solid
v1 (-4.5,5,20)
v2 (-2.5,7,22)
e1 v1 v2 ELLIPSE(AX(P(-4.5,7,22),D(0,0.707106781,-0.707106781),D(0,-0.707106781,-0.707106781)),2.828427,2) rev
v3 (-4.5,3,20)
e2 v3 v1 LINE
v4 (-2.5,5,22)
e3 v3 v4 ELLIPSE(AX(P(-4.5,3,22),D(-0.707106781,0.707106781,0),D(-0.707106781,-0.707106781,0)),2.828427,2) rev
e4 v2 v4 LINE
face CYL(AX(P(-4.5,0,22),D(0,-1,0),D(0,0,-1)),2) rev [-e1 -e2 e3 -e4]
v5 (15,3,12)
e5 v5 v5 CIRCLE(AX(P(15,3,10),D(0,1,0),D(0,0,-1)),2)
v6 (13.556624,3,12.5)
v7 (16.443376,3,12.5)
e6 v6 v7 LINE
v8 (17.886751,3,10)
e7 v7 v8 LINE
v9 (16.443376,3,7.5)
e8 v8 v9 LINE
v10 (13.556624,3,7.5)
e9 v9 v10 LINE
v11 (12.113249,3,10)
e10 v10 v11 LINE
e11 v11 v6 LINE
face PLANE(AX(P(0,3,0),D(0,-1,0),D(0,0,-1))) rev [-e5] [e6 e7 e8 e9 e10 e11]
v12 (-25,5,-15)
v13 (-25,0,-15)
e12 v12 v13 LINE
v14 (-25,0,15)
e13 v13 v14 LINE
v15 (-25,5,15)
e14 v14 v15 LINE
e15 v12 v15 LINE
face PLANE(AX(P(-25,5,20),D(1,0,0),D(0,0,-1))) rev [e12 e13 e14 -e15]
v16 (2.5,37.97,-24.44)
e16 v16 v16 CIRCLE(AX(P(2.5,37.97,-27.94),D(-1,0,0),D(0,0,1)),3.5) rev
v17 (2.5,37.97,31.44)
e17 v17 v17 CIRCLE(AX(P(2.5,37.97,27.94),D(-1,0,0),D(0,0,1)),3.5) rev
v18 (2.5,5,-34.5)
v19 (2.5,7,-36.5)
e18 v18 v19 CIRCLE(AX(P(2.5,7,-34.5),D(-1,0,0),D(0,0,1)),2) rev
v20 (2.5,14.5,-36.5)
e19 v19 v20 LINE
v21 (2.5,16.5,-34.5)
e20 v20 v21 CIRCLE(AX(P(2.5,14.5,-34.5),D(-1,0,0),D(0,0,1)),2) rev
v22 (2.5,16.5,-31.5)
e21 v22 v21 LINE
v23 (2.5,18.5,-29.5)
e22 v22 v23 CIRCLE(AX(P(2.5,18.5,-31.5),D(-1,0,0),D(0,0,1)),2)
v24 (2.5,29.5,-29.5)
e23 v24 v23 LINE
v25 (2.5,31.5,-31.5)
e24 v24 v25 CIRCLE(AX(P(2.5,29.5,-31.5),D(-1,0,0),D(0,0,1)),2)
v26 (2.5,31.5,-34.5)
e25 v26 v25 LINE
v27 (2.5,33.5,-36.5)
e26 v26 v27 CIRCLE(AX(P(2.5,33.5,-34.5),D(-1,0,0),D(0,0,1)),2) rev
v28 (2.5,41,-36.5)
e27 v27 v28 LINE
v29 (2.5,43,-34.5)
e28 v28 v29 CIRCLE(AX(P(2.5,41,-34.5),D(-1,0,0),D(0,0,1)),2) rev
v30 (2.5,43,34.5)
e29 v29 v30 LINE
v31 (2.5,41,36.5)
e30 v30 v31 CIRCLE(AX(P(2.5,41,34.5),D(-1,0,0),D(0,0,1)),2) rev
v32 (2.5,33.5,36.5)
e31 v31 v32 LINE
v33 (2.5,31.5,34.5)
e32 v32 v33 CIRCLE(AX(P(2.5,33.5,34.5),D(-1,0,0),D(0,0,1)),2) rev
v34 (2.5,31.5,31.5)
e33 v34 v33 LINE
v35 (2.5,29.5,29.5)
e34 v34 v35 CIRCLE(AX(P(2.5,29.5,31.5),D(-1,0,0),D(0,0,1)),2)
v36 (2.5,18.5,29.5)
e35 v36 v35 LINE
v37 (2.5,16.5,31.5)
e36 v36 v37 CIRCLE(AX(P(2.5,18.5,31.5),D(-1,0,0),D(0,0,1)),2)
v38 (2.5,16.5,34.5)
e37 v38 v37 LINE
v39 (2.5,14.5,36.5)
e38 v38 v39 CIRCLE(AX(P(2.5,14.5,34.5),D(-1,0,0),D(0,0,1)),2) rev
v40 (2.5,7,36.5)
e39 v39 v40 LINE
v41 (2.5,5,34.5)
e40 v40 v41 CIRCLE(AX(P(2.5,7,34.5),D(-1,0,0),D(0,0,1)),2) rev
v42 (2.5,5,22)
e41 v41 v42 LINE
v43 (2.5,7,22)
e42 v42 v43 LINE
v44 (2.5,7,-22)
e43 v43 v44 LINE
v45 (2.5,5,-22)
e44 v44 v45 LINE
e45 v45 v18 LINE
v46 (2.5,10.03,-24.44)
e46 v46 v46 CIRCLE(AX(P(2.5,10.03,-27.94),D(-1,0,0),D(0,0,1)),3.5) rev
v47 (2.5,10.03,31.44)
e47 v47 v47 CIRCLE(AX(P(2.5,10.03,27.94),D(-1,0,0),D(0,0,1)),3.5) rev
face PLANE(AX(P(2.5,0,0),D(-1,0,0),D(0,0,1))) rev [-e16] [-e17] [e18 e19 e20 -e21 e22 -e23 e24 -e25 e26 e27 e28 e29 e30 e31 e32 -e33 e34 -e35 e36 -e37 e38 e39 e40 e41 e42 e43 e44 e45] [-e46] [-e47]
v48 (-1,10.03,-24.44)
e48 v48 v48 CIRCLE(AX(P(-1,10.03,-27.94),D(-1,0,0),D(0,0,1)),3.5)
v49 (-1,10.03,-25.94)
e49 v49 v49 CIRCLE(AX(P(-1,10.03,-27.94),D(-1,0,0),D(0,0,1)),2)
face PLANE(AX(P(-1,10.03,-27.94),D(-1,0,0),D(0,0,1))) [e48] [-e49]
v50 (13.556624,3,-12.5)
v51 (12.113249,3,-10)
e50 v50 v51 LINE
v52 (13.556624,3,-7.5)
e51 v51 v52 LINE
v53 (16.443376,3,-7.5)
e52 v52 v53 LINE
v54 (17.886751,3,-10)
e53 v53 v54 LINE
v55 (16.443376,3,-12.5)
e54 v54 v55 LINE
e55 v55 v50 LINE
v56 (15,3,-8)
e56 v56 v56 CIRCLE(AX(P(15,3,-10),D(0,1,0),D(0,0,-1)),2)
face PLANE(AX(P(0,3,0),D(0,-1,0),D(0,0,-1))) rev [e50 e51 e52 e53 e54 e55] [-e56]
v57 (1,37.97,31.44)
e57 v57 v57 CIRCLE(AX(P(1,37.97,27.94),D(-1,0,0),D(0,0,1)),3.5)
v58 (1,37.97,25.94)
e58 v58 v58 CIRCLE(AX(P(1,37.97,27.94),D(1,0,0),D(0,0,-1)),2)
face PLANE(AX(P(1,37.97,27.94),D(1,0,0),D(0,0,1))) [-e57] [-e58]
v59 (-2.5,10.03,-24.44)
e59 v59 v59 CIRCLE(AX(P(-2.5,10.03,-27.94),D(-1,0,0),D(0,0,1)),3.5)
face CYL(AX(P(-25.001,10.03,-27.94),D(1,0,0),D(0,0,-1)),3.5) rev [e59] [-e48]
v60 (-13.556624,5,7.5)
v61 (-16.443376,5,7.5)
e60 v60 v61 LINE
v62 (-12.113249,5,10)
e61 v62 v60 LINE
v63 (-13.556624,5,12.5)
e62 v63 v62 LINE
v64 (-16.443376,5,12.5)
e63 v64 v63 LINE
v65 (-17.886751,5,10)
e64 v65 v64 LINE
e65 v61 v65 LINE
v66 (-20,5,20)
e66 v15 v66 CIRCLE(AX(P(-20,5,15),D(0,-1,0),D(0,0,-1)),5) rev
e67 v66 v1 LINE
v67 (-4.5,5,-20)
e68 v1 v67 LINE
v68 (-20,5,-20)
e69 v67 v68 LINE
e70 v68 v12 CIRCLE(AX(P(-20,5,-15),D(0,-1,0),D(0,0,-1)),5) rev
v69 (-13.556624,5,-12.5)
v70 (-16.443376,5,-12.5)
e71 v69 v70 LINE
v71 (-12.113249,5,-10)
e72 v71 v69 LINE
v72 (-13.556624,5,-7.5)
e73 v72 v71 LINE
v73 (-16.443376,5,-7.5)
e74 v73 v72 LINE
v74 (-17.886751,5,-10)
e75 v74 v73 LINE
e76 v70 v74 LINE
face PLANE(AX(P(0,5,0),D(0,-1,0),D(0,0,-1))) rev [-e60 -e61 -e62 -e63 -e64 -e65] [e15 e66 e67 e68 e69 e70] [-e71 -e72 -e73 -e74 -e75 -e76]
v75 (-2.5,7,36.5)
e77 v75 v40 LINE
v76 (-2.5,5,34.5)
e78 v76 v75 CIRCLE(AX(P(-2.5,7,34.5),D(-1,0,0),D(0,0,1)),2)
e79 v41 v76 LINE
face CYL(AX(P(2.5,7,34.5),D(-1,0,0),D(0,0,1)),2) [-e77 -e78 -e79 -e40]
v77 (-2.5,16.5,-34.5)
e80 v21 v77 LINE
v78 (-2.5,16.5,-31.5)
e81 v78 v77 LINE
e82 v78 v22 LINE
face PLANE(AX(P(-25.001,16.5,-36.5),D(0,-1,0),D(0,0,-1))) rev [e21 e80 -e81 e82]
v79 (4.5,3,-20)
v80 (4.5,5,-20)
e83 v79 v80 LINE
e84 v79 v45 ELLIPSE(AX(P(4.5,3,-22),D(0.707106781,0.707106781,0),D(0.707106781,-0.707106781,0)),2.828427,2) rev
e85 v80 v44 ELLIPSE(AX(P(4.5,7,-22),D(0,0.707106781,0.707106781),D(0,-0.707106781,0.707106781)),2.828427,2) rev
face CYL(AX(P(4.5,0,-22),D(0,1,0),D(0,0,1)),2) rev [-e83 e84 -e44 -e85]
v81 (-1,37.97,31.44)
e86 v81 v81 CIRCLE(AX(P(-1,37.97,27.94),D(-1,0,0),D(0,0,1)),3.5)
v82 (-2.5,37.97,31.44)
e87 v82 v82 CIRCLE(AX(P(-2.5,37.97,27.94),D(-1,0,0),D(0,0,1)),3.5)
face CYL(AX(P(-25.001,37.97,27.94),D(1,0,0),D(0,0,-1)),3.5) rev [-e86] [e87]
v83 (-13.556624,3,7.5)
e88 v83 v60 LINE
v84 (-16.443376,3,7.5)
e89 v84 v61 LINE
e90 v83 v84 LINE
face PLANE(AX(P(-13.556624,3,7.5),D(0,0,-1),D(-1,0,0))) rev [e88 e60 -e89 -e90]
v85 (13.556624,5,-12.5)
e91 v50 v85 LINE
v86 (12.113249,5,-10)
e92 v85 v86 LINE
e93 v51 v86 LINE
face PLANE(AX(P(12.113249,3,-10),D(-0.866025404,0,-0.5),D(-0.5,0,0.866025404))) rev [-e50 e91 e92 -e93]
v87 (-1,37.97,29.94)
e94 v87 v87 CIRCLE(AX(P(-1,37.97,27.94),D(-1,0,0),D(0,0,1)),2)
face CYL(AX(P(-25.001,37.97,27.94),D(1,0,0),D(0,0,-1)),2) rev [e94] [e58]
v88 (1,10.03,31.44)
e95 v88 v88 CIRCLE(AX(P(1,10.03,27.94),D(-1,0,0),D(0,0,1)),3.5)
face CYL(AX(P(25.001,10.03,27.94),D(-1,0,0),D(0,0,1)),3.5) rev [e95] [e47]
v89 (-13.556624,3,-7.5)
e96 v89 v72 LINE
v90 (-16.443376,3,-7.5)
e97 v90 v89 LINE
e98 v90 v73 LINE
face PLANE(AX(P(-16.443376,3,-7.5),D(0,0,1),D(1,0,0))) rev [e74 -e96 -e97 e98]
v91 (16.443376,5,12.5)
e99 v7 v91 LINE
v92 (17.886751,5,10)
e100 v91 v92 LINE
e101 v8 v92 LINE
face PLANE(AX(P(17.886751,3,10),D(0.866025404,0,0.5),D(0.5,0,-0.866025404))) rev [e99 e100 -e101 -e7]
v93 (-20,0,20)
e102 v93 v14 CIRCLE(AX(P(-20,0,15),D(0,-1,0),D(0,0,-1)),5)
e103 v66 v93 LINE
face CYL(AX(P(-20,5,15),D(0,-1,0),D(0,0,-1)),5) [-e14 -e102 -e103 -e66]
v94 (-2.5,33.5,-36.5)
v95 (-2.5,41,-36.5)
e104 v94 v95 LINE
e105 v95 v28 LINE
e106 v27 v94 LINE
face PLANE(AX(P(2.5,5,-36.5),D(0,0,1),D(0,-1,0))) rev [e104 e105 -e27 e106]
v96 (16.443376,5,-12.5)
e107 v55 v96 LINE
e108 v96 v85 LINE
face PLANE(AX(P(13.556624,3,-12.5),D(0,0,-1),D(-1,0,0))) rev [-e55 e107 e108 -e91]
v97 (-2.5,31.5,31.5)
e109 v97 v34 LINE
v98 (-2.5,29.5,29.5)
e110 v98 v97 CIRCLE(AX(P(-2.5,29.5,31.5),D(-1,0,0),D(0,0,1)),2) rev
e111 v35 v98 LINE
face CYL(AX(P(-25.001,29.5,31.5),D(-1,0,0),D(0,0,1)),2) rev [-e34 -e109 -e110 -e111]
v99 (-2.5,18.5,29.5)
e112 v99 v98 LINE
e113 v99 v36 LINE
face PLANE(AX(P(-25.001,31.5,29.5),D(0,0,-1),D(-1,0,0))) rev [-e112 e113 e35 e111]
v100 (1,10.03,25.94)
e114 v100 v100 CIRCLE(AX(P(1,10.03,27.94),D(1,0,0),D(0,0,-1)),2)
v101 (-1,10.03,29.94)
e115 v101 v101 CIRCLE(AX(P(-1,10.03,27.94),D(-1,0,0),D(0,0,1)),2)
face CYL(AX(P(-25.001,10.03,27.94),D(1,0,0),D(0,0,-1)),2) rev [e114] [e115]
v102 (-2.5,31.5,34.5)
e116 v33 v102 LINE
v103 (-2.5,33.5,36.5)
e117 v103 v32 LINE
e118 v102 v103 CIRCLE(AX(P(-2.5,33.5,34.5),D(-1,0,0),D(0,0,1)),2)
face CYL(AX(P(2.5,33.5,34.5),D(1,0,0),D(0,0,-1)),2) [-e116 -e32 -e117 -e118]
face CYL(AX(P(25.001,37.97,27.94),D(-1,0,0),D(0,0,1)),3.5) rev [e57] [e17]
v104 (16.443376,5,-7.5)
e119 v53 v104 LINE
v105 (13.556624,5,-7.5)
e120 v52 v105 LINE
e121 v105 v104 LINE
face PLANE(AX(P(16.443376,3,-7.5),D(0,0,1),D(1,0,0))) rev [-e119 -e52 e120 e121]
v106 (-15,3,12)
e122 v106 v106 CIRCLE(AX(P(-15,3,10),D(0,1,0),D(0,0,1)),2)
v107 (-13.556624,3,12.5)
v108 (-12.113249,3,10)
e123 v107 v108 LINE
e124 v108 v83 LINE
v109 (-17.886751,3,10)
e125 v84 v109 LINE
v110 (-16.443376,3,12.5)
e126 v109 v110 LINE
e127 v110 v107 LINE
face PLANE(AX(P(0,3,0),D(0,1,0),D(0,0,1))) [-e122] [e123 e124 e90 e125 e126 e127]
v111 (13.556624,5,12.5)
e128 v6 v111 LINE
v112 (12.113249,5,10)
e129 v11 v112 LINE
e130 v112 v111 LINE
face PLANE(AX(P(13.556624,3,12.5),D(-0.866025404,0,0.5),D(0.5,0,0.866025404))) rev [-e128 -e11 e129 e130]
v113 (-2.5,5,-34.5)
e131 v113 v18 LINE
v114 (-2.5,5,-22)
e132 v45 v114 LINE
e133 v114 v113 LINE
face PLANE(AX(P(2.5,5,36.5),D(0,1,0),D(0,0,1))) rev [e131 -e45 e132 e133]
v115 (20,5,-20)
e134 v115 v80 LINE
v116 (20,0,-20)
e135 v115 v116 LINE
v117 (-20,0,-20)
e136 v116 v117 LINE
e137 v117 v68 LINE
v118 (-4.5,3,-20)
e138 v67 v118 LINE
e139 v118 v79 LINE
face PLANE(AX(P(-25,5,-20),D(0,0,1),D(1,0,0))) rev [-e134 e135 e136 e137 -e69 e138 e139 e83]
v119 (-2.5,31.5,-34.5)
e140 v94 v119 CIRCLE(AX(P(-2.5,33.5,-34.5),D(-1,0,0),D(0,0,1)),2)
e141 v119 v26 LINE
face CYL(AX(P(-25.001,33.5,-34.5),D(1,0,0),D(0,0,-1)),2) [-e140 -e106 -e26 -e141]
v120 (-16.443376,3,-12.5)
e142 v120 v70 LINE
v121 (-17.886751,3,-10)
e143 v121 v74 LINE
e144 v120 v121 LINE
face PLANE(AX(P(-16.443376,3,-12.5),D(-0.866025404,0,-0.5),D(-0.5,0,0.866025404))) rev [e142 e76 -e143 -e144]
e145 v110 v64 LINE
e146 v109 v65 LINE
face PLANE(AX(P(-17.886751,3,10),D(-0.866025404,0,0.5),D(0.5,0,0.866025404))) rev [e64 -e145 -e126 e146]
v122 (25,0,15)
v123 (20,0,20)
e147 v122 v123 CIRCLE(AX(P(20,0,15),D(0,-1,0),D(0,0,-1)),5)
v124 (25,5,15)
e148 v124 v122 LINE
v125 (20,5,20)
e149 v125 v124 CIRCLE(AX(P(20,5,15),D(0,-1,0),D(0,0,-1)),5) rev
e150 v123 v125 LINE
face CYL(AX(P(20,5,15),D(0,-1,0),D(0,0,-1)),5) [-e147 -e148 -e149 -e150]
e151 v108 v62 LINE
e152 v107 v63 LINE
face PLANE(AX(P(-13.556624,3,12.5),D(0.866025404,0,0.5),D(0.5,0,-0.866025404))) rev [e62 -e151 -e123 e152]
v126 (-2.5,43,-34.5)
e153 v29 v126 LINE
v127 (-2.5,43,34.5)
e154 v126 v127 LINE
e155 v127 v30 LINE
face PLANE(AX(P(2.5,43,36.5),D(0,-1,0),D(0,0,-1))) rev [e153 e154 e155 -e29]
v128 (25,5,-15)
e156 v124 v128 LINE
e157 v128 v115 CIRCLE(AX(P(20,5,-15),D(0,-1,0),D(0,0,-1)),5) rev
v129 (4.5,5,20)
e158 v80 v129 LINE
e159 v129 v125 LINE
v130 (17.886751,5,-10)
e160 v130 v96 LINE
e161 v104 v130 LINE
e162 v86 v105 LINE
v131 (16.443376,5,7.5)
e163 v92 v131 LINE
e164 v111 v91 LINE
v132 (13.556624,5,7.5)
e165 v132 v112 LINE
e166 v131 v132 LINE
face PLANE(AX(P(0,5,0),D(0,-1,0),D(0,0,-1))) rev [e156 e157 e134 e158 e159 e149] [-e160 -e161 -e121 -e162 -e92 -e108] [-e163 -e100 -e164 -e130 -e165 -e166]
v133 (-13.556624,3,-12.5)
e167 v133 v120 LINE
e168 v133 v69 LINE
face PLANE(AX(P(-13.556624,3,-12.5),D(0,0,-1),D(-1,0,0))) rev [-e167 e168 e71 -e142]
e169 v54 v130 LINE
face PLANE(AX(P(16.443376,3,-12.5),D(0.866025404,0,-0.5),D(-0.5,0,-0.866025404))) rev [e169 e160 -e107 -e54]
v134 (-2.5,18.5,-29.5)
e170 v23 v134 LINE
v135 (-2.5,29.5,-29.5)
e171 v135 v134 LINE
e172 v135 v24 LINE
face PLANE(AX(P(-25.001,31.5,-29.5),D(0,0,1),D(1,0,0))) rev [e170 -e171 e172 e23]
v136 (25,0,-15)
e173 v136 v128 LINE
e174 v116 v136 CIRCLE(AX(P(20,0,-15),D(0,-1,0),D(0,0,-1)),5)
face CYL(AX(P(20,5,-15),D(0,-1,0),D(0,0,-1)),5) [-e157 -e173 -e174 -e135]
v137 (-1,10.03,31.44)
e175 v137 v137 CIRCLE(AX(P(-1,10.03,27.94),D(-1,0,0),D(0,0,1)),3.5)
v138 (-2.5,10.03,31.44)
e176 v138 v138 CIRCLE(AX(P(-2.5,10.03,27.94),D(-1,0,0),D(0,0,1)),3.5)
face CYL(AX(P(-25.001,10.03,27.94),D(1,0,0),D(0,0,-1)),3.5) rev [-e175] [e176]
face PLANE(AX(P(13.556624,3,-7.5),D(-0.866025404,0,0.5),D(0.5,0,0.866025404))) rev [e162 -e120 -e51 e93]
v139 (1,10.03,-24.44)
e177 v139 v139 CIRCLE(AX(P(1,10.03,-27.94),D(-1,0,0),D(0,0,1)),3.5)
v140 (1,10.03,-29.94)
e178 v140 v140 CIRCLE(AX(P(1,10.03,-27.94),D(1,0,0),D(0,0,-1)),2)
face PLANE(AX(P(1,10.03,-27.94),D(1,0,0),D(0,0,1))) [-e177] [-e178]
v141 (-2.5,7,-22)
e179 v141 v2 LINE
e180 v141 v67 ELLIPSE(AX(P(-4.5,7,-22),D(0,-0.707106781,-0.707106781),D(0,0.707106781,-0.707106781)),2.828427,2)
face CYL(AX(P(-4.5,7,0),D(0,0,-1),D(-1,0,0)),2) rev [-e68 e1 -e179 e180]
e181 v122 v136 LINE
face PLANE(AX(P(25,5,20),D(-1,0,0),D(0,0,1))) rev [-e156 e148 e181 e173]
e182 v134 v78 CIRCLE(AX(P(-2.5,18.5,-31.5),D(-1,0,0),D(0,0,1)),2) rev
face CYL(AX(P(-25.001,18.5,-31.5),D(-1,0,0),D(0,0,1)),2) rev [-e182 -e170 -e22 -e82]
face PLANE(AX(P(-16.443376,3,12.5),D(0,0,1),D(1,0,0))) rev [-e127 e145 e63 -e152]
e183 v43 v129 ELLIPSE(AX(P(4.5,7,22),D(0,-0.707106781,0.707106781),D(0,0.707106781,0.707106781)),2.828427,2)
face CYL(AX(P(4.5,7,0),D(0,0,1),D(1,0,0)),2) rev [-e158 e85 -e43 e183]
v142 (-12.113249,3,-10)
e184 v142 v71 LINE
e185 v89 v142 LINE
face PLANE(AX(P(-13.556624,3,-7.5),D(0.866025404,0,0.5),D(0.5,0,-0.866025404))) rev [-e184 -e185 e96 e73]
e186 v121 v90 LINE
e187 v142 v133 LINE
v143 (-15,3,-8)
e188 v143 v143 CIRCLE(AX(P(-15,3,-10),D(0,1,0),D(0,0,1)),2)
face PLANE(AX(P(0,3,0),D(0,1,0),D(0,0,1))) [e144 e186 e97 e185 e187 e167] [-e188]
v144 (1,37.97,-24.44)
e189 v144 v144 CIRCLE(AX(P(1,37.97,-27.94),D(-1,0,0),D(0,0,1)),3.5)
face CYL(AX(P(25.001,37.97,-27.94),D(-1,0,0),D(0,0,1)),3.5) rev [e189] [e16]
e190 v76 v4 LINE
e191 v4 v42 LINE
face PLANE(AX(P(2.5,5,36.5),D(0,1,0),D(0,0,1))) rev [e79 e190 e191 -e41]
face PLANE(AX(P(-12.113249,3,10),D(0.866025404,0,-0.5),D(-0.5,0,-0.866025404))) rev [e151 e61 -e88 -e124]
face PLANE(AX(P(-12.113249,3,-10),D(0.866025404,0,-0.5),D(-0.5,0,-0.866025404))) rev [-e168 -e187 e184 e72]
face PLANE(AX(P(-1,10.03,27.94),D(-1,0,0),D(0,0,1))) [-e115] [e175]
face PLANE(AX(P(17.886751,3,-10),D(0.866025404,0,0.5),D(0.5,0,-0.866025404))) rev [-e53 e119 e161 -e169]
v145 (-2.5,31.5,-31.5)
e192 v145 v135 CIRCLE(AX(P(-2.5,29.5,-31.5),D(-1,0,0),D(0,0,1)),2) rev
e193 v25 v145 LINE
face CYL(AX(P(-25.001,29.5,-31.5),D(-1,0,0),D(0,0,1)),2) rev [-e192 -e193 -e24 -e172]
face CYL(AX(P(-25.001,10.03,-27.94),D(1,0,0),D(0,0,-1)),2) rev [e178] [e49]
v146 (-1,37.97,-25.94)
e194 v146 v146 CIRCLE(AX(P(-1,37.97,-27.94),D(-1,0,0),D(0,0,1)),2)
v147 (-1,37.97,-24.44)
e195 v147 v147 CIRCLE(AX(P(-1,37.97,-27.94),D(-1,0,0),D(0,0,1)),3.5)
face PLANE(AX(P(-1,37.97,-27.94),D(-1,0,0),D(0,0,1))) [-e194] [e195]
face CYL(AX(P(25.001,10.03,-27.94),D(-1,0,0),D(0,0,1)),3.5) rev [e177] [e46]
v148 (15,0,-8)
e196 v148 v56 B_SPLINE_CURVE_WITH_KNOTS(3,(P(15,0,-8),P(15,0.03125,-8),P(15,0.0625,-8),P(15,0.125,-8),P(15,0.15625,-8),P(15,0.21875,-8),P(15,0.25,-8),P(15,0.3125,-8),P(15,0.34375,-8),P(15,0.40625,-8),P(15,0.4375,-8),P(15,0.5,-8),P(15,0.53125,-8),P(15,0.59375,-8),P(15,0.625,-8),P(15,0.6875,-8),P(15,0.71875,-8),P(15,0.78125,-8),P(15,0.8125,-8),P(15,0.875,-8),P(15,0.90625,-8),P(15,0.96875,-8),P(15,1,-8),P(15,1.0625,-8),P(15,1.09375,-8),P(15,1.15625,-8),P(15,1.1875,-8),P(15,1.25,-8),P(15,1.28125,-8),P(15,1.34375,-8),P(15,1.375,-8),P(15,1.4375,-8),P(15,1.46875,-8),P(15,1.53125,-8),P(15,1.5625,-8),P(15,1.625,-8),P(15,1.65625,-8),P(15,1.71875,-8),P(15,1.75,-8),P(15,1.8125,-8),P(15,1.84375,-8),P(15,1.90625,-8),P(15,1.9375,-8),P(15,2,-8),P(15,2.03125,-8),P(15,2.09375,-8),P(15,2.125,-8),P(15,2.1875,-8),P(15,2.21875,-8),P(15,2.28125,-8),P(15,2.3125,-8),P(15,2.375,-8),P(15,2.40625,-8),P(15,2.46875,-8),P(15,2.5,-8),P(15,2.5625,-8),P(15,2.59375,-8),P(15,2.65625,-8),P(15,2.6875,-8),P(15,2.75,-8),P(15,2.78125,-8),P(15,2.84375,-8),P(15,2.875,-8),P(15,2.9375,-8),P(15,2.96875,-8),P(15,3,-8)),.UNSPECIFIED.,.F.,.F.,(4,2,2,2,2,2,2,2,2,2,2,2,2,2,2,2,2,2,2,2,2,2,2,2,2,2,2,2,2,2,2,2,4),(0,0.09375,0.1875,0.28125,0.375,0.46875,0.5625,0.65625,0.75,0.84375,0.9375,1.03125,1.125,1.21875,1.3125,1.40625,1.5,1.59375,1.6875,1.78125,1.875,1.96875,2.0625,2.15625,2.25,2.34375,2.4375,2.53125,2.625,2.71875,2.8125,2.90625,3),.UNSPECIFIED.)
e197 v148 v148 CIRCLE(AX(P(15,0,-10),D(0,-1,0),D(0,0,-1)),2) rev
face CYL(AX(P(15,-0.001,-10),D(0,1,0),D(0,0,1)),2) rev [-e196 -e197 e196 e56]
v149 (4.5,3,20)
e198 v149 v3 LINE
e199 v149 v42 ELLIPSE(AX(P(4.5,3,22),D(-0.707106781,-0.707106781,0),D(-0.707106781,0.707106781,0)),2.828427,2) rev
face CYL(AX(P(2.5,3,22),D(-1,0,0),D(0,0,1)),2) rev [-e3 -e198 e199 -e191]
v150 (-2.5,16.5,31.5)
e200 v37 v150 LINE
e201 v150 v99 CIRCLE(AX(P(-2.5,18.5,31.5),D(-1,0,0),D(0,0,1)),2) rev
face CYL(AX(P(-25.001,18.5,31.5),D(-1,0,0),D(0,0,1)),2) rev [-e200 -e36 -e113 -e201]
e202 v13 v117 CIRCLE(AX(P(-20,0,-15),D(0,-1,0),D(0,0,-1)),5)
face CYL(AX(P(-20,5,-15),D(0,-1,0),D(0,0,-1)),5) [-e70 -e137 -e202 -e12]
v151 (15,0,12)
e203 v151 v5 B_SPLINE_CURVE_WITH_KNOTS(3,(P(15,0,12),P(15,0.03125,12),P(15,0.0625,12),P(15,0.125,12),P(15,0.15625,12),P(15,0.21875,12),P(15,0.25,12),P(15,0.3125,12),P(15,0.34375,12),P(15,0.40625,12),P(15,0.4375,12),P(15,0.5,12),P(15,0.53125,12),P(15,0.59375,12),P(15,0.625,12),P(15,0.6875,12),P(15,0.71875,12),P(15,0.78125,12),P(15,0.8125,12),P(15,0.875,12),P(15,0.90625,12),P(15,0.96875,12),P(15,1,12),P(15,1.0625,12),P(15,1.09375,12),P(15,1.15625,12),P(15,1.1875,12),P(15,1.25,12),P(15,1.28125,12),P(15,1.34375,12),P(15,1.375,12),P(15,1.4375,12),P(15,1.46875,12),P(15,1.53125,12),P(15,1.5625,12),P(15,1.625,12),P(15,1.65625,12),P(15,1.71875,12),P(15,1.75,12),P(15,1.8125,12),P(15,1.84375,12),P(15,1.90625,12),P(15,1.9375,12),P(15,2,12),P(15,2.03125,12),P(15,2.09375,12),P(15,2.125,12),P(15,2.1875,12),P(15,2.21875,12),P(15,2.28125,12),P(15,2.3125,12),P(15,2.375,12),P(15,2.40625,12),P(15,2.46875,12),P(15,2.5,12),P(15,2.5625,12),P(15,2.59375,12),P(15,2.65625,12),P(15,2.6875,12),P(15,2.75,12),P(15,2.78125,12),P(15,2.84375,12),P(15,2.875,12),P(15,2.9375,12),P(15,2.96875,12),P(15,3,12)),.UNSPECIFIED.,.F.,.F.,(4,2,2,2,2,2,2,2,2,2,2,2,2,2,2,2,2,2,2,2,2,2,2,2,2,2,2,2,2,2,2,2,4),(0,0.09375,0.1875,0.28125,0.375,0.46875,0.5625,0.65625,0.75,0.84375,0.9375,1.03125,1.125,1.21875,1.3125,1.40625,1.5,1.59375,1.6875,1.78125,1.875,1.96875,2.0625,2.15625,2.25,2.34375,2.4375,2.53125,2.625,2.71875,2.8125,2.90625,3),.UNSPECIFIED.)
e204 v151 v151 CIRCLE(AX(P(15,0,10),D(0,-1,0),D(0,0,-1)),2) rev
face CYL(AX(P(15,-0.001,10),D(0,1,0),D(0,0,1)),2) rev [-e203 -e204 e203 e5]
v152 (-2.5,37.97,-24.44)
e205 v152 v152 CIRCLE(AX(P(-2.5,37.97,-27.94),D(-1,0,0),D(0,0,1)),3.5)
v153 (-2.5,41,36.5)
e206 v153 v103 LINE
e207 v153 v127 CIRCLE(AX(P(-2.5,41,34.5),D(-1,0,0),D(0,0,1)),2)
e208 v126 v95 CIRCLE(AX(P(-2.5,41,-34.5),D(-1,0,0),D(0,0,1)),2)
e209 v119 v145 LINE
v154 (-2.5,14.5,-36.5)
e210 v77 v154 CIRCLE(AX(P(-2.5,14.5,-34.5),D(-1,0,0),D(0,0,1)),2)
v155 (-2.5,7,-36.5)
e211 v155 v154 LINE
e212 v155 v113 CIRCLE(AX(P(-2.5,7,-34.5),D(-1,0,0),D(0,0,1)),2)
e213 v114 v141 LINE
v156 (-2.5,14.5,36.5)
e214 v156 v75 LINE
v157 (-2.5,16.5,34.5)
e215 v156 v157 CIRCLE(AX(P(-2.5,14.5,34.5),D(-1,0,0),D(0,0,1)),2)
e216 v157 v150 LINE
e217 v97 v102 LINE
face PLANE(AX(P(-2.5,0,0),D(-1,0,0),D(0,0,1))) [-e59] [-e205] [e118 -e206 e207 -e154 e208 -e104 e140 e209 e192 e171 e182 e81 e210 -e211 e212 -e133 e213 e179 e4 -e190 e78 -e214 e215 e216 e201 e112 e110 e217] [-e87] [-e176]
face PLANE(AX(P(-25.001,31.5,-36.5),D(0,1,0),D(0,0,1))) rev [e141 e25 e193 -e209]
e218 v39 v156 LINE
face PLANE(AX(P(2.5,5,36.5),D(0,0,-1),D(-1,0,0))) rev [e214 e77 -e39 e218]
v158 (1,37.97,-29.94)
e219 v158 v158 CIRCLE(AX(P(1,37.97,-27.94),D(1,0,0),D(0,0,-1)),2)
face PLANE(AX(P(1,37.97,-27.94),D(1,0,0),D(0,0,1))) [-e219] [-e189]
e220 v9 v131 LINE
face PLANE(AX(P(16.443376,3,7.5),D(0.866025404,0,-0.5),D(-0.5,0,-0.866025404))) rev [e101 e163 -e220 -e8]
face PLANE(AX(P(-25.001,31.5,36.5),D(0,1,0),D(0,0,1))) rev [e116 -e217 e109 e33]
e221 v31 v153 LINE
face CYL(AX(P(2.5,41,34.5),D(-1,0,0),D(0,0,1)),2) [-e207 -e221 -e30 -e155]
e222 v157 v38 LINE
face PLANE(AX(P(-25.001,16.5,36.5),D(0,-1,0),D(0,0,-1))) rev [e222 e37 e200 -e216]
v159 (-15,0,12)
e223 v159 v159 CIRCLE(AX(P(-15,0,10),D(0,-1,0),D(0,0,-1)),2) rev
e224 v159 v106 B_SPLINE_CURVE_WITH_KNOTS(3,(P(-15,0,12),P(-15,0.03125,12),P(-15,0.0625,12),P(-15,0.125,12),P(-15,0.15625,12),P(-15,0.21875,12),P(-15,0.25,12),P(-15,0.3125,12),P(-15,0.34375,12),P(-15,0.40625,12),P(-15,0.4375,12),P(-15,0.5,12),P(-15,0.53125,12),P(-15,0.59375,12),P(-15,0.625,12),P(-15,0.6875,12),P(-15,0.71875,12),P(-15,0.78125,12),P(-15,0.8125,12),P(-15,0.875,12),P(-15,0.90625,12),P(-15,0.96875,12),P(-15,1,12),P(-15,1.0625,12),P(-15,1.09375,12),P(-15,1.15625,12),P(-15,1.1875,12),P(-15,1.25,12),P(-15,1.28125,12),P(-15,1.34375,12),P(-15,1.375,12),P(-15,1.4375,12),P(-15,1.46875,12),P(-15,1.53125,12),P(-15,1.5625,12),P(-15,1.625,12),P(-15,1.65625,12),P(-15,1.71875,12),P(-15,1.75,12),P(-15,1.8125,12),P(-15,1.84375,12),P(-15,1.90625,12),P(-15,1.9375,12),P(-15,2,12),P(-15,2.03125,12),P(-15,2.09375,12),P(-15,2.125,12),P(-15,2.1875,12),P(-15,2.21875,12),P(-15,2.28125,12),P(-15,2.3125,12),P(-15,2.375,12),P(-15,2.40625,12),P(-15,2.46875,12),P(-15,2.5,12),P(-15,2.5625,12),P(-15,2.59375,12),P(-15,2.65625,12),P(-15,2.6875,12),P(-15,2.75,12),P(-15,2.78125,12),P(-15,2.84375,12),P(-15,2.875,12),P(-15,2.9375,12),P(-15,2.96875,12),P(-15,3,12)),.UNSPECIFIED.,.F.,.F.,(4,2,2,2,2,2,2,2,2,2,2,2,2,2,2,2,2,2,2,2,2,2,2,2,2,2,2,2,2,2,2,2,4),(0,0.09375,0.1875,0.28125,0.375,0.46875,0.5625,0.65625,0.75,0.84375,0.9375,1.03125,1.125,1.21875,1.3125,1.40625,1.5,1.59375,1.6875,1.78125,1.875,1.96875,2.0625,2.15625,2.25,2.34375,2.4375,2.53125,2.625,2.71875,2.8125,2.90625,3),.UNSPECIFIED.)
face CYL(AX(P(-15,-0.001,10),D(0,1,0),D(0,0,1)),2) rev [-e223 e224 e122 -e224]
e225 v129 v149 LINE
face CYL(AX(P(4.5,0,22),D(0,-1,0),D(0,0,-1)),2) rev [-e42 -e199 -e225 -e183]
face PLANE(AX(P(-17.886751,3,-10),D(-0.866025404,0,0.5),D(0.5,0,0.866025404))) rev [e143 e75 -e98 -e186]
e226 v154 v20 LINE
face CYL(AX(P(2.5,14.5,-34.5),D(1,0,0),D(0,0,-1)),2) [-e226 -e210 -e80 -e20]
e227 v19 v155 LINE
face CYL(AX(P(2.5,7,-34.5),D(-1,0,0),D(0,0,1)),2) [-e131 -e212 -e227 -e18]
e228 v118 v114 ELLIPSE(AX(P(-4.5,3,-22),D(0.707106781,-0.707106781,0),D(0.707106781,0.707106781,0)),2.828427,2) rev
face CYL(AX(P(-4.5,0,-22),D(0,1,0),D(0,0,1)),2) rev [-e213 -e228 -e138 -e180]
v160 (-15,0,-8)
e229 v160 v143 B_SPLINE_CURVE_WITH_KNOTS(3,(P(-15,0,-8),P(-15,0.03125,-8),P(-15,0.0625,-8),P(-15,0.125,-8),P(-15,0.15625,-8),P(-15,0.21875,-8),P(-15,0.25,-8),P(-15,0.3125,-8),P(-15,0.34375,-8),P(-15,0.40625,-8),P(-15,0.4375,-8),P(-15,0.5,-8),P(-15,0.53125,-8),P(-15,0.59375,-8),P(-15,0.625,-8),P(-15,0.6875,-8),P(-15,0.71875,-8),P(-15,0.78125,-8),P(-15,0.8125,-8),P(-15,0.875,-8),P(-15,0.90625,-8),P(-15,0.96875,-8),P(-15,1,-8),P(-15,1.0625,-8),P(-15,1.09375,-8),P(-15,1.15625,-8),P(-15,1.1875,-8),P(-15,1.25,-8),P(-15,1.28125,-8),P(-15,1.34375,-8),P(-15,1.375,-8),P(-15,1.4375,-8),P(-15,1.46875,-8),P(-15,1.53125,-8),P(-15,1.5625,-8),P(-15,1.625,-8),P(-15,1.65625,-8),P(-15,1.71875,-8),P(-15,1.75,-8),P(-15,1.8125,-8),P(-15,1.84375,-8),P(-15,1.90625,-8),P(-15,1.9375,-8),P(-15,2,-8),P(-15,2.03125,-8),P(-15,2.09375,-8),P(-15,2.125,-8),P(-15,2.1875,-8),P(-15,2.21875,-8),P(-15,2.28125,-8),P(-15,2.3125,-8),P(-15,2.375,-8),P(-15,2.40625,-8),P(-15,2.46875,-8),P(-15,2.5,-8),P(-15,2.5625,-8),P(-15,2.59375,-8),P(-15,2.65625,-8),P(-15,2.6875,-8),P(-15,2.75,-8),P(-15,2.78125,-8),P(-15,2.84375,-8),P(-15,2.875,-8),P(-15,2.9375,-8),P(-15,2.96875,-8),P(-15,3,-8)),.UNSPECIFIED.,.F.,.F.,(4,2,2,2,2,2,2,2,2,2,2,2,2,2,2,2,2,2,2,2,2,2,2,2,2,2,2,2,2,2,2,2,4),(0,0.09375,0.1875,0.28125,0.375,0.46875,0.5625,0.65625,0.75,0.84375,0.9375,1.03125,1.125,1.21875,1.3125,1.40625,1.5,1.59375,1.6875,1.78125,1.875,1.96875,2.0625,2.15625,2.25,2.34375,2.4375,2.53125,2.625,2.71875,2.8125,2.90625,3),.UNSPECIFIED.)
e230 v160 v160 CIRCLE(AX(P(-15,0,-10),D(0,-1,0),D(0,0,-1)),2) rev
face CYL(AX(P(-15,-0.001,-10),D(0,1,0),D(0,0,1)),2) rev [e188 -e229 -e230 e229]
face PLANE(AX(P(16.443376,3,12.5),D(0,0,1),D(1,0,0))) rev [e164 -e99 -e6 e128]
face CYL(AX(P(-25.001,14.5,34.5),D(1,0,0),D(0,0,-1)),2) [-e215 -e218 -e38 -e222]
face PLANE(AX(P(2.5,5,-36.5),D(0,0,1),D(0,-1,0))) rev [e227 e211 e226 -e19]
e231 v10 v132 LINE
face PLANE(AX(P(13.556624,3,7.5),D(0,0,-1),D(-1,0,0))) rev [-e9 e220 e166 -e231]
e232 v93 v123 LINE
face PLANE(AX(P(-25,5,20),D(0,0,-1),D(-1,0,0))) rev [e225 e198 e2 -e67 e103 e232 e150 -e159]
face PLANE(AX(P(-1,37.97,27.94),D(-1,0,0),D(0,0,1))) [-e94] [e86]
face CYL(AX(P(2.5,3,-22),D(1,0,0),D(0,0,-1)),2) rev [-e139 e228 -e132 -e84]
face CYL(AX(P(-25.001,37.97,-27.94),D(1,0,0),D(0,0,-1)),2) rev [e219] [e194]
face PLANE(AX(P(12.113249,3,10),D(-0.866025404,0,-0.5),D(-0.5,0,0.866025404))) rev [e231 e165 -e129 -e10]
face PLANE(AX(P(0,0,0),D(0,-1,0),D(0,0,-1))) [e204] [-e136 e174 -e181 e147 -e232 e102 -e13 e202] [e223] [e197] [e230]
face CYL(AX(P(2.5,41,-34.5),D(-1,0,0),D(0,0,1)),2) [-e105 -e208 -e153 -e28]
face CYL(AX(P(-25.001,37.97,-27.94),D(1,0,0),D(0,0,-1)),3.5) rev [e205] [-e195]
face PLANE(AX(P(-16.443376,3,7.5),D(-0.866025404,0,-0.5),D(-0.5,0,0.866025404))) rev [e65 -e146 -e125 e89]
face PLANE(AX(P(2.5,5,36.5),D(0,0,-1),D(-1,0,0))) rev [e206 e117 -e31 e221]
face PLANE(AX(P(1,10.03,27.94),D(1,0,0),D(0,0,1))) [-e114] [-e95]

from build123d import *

# Parameters (mm, degrees)
ESQUISSE2_W             = 50
ESQUISSE2_H             = 40
BOSS_EXTRU_1_DEPTH      = 5
ESQUISSE3_W             = 73
ESQUISSE3_H             = 38
BOSS_EXTRU_2_DEPTH      = 2.5
ENL_V_MAT_EXTRU_1_REACH = 64.75
ESQUISSE4_R             = 2
ENL_V_MAT_EXTRU_2_REACH = 64.75
ESQUISSE5_W             = 7
ESQUISSE5_H             = 15
CONG_1_R                = 2
CONG_2_R                = 5
CONG_3_R                = 2
ENL_V_MAT_EXTRU_3_DEPTH = 2
ENL_V_MAT_EXTRU_4_REACH = 64.107
ESQUISSE7_R             = 3.5
ENL_V_MAT_EXTRU_5_REACH = 61.643
ESQUISSE8_R             = 2


with BuildPart() as part:
    # Esquisse2 → Boss.-Extru.1 (new body)
    with BuildSketch(Plane(origin=(0, 0, 0), x_dir=(1, 0, 0), z_dir=(0, 1, 0))):
        Rectangle(ESQUISSE2_W, ESQUISSE2_H)
    extrude(amount=BOSS_EXTRU_1_DEPTH)

    # Esquisse3 → Boss.-Extru.2 (add, symmetric)
    with BuildSketch(Plane(origin=(0, 0, 0), x_dir=(0, 0, -1), z_dir=(1, 0, 0))):
        with Locations((0, 24)):
            Rectangle(ESQUISSE3_W, ESQUISSE3_H)
    extrude(amount=BOSS_EXTRU_2_DEPTH, both=True)

    # Esquisse4 → Enlèv. mat.-Extru.1 (cut, up to next)
    with BuildSketch(Plane(origin=(2.5, 0, 0), x_dir=(0, 0, -1), z_dir=(1, 0, 0)), mode=Mode.PRIVATE) as enl_v_mat_extru_1_sk1:
        with Locations((-27.94, 37.97)):
            Circle(ESQUISSE4_R)
    enl_v_mat_extru_1_tool1 = extrude(enl_v_mat_extru_1_sk1.sketch, amount=-ENL_V_MAT_EXTRU_1_REACH, mode=Mode.PRIVATE) & part.part
    # Esquisse4 → Enlèv. mat.-Extru.1 (cut, up to next)
    with BuildSketch(Plane(origin=(2.5, 0, 0), x_dir=(0, 0, -1), z_dir=(1, 0, 0)), mode=Mode.PRIVATE) as enl_v_mat_extru_1_sk2:
        with Locations((-27.94, 10.03)):
            Circle(ESQUISSE4_R)
    enl_v_mat_extru_1_tool2 = extrude(enl_v_mat_extru_1_sk2.sketch, amount=-ENL_V_MAT_EXTRU_1_REACH, mode=Mode.PRIVATE) & part.part
    # Esquisse4 → Enlèv. mat.-Extru.1 (cut, up to next)
    with BuildSketch(Plane(origin=(2.5, 0, 0), x_dir=(0, 0, -1), z_dir=(1, 0, 0)), mode=Mode.PRIVATE) as enl_v_mat_extru_1_sk3:
        with Locations((27.94, 37.97)):
            Circle(ESQUISSE4_R)
    enl_v_mat_extru_1_tool3 = extrude(enl_v_mat_extru_1_sk3.sketch, amount=-ENL_V_MAT_EXTRU_1_REACH, mode=Mode.PRIVATE) & part.part
    # Esquisse4 → Enlèv. mat.-Extru.1 (cut, up to next)
    with BuildSketch(Plane(origin=(2.5, 0, 0), x_dir=(0, 0, -1), z_dir=(1, 0, 0)), mode=Mode.PRIVATE) as enl_v_mat_extru_1_sk4:
        with Locations((27.94, 10.03)):
            Circle(ESQUISSE4_R)
    enl_v_mat_extru_1_tool4 = extrude(enl_v_mat_extru_1_sk4.sketch, amount=-ENL_V_MAT_EXTRU_1_REACH, mode=Mode.PRIVATE) & part.part
    add(enl_v_mat_extru_1_tool1.solids().sort_by_distance((2.5, 37.97, 27.94))[0], mode=Mode.SUBTRACT)
    add(enl_v_mat_extru_1_tool2.solids().sort_by_distance((2.5, 10.03, 27.94))[0], mode=Mode.SUBTRACT)
    add(enl_v_mat_extru_1_tool3.solids().sort_by_distance((2.5, 37.97, -27.94))[0], mode=Mode.SUBTRACT)
    add(enl_v_mat_extru_1_tool4.solids().sort_by_distance((2.5, 10.03, -27.94))[0], mode=Mode.SUBTRACT)

    # Esquisse5 → Enlèv. mat.-Extru.2 (cut, up to next)
    with BuildSketch(Plane(origin=(2.5, 0, 0), x_dir=(0, 0, -1), z_dir=(1, 0, 0)), mode=Mode.PRIVATE) as enl_v_mat_extru_2_sk1:
        with Locations((-33, 24)):
            Rectangle(ESQUISSE5_W, ESQUISSE5_H)
    enl_v_mat_extru_2_tool1 = extrude(enl_v_mat_extru_2_sk1.sketch, amount=-ENL_V_MAT_EXTRU_2_REACH, mode=Mode.PRIVATE) & part.part
    # Esquisse5 → Enlèv. mat.-Extru.2 (cut, up to next)
    with BuildSketch(Plane(origin=(2.5, 0, 0), x_dir=(0, 0, -1), z_dir=(1, 0, 0)), mode=Mode.PRIVATE) as enl_v_mat_extru_2_sk2:
        with Locations((33, 24)):
            Rectangle(ESQUISSE5_W, ESQUISSE5_H)
    enl_v_mat_extru_2_tool2 = extrude(enl_v_mat_extru_2_sk2.sketch, amount=-ENL_V_MAT_EXTRU_2_REACH, mode=Mode.PRIVATE) & part.part
    add(enl_v_mat_extru_2_tool1.solids().sort_by_distance((2.5, 24, 33))[0], mode=Mode.SUBTRACT)
    add(enl_v_mat_extru_2_tool2.solids().sort_by_distance((2.5, 24, -33))[0], mode=Mode.SUBTRACT)

    # Congé1
    cong_1_edges = [part.edges().sort_by_distance(p)[0] for p in [
        (0, 16.5, -29.5),
        (0, 31.5, -29.5),
        (0, 16.5, 29.5),
        (0, 31.5, 29.5),
        (-2.5, 5, 0),
        (2.5, 5, 0),
    ]]
    fillet(cong_1_edges, radius=CONG_1_R)
    cong_1_2_edges = [part.edges().sort_by_distance(p)[0] for p in [
        (0, 5, -36.5),
        (0, 16.5, -36.5),
        (0, 43, -36.5),
        (0, 31.5, -36.5),
        (0, 5, 36.5),
        (0, 16.5, 36.5),
        (0, 31.5, 36.5),
        (0, 43, 36.5),
    ]]
    fillet(cong_1_2_edges, radius=CONG_1_R)

    # Congé2
    cong_2_edges = [part.edges().sort_by_distance(p)[0] for p in [
        (25, 2.5, 20),
        (-25, 2.5, 20),
        (-25, 2.5, -20),
        (25, 2.5, -20),
    ]]
    fillet(cong_2_edges, radius=CONG_2_R)

    # Congé3
    cong_3_edges = [part.edges().sort_by_distance(p)[0] for p in [
        (-2.5, 6, 20),
        (2.5, 6, 20),
        (0, 5, 20),
        (2.5, 6, -20),
        (-2.5, 6, -20),
        (0, 5, -20),
    ]]
    fillet(cong_3_edges, radius=CONG_3_R - 0.0001)  # a hair under: the kernel refuses the full size

    # Esquisse6 → Enlèv. mat.-Extru.3 (cut)
    with BuildSketch(Plane(origin=(0, 5, 0), x_dir=(1, 0, 0), z_dir=(0, 1, 0))):
        Polygon((-12.113248654, 10), (-13.556624327, 12.5), (-16.443375673, 12.5), (-17.886751346, 10), (-16.443375673, 7.5), (-13.556624327, 7.5), align=None)
        Polygon((-12.113248654, -10), (-13.556624327, -7.5), (-16.443375673, -7.5), (-17.886751346, -10), (-16.443375673, -12.5), (-13.556624327, -12.5), align=None)
        Polygon((13.556624327, -12.5), (12.113248654, -10), (13.556624327, -7.5), (16.443375673, -7.5), (17.886751346, -10), (16.443375673, -12.5), align=None)
        Polygon((13.556624327, 7.5), (12.113248654, 10), (13.556624327, 12.5), (16.443375673, 12.5), (17.886751346, 10), (16.443375673, 7.5), align=None)
    extrude(amount=-ENL_V_MAT_EXTRU_3_DEPTH, mode=Mode.SUBTRACT)

    # Esquisse7 → Enlèv. mat.-Extru.4 (cut, up to next)
    with BuildSketch(Plane.ZY.offset(1), mode=Mode.PRIVATE) as enl_v_mat_extru_4_sk1:
        with Locations((-27.94, 37.97)):
            Circle(ESQUISSE7_R)
    enl_v_mat_extru_4_tool1 = extrude(enl_v_mat_extru_4_sk1.sketch, amount=ENL_V_MAT_EXTRU_4_REACH, mode=Mode.PRIVATE) & part.part
    # Esquisse7 → Enlèv. mat.-Extru.4 (cut, up to next)
    with BuildSketch(Plane.ZY.offset(1), mode=Mode.PRIVATE) as enl_v_mat_extru_4_sk2:
        with Locations((-27.94, 10.03)):
            Circle(ESQUISSE7_R)
    enl_v_mat_extru_4_tool2 = extrude(enl_v_mat_extru_4_sk2.sketch, amount=ENL_V_MAT_EXTRU_4_REACH, mode=Mode.PRIVATE) & part.part
    # Esquisse7 → Enlèv. mat.-Extru.4 (cut, up to next)
    with BuildSketch(Plane.ZY.offset(1), mode=Mode.PRIVATE) as enl_v_mat_extru_4_sk3:
        with Locations((27.94, 37.97)):
            Circle(ESQUISSE7_R)
    enl_v_mat_extru_4_tool3 = extrude(enl_v_mat_extru_4_sk3.sketch, amount=ENL_V_MAT_EXTRU_4_REACH, mode=Mode.PRIVATE) & part.part
    # Esquisse7 → Enlèv. mat.-Extru.4 (cut, up to next)
    with BuildSketch(Plane.ZY.offset(1), mode=Mode.PRIVATE) as enl_v_mat_extru_4_sk4:
        with Locations((27.94, 10.03)):
            Circle(ESQUISSE7_R)
    enl_v_mat_extru_4_tool4 = extrude(enl_v_mat_extru_4_sk4.sketch, amount=ENL_V_MAT_EXTRU_4_REACH, mode=Mode.PRIVATE) & part.part
    enl_v_mat_extru_4_1 = enl_v_mat_extru_4_tool1.solids().sort_by_distance((-1, 37.97, -27.94))[0]
    add(enl_v_mat_extru_4_1, mode=Mode.SUBTRACT)
    enl_v_mat_extru_4_2 = enl_v_mat_extru_4_tool2.solids().sort_by_distance((-1, 10.03, -27.94))[0]
    add(enl_v_mat_extru_4_2, mode=Mode.SUBTRACT)
    enl_v_mat_extru_4_3 = enl_v_mat_extru_4_tool3.solids().sort_by_distance((-1, 37.97, 27.94))[0]
    add(enl_v_mat_extru_4_3, mode=Mode.SUBTRACT)
    enl_v_mat_extru_4_4 = enl_v_mat_extru_4_tool4.solids().sort_by_distance((-1, 10.03, 27.94))[0]
    add(enl_v_mat_extru_4_4, mode=Mode.SUBTRACT)
    enl_v_mat_extru_4 = enl_v_mat_extru_4_1 + enl_v_mat_extru_4_2 + enl_v_mat_extru_4_3 + enl_v_mat_extru_4_4  # Enlèv. mat.-Extru.4 as one shape, for the pattern or mirror that repeats it

    # Symétrie3: Enlèv. mat.-Extru.4 across plane
    add(enl_v_mat_extru_4.mirror(Plane(origin=(0, 0, 0), x_dir=(0, 0, 1), z_dir=(1, 0, 0))), mode=Mode.SUBTRACT)

    # Esquisse8 → Enlèv. mat.-Extru.5 (cut, up to next)
    with BuildSketch(Plane(origin=(0, 3, 0), x_dir=(1, 0, 0), z_dir=(0, 1, 0)), mode=Mode.PRIVATE) as enl_v_mat_extru_5_sk1:
        with Locations(Location((-15, 10, 0), (0, 0, 270))):
            Circle(ESQUISSE8_R)
    enl_v_mat_extru_5_tool1 = extrude(enl_v_mat_extru_5_sk1.sketch, amount=-ENL_V_MAT_EXTRU_5_REACH, mode=Mode.PRIVATE) & part.part
    # Esquisse8 → Enlèv. mat.-Extru.5 (cut, up to next)
    with BuildSketch(Plane(origin=(0, 3, 0), x_dir=(1, 0, 0), z_dir=(0, 1, 0)), mode=Mode.PRIVATE) as enl_v_mat_extru_5_sk2:
        with Locations(Location((-15, -10, 0), (0, 0, 270))):
            Circle(ESQUISSE8_R)
    enl_v_mat_extru_5_tool2 = extrude(enl_v_mat_extru_5_sk2.sketch, amount=-ENL_V_MAT_EXTRU_5_REACH, mode=Mode.PRIVATE) & part.part
    # Esquisse8 → Enlèv. mat.-Extru.5 (cut, up to next)
    with BuildSketch(Plane(origin=(0, 3, 0), x_dir=(1, 0, 0), z_dir=(0, 1, 0)), mode=Mode.PRIVATE) as enl_v_mat_extru_5_sk3:
        with Locations(Location((15, -10, 0), (0, 0, 270))):
            Circle(ESQUISSE8_R)
    enl_v_mat_extru_5_tool3 = extrude(enl_v_mat_extru_5_sk3.sketch, amount=-ENL_V_MAT_EXTRU_5_REACH, mode=Mode.PRIVATE) & part.part
    # Esquisse8 → Enlèv. mat.-Extru.5 (cut, up to next)
    with BuildSketch(Plane(origin=(0, 3, 0), x_dir=(1, 0, 0), z_dir=(0, 1, 0)), mode=Mode.PRIVATE) as enl_v_mat_extru_5_sk4:
        with Locations(Location((15, 10, 0), (0, 0, 270))):
            Circle(ESQUISSE8_R)
    enl_v_mat_extru_5_tool4 = extrude(enl_v_mat_extru_5_sk4.sketch, amount=-ENL_V_MAT_EXTRU_5_REACH, mode=Mode.PRIVATE) & part.part
    add(enl_v_mat_extru_5_tool1.solids().sort_by_distance((-15, 3, -10))[0], mode=Mode.SUBTRACT)
    add(enl_v_mat_extru_5_tool2.solids().sort_by_distance((-15, 3, 10))[0], mode=Mode.SUBTRACT)
    add(enl_v_mat_extru_5_tool3.solids().sort_by_distance((15, 3, 10))[0], mode=Mode.SUBTRACT)
    add(enl_v_mat_extru_5_tool4.solids().sort_by_distance((15, 3, -10))[0], mode=Mode.SUBTRACT)


solid = part.part
